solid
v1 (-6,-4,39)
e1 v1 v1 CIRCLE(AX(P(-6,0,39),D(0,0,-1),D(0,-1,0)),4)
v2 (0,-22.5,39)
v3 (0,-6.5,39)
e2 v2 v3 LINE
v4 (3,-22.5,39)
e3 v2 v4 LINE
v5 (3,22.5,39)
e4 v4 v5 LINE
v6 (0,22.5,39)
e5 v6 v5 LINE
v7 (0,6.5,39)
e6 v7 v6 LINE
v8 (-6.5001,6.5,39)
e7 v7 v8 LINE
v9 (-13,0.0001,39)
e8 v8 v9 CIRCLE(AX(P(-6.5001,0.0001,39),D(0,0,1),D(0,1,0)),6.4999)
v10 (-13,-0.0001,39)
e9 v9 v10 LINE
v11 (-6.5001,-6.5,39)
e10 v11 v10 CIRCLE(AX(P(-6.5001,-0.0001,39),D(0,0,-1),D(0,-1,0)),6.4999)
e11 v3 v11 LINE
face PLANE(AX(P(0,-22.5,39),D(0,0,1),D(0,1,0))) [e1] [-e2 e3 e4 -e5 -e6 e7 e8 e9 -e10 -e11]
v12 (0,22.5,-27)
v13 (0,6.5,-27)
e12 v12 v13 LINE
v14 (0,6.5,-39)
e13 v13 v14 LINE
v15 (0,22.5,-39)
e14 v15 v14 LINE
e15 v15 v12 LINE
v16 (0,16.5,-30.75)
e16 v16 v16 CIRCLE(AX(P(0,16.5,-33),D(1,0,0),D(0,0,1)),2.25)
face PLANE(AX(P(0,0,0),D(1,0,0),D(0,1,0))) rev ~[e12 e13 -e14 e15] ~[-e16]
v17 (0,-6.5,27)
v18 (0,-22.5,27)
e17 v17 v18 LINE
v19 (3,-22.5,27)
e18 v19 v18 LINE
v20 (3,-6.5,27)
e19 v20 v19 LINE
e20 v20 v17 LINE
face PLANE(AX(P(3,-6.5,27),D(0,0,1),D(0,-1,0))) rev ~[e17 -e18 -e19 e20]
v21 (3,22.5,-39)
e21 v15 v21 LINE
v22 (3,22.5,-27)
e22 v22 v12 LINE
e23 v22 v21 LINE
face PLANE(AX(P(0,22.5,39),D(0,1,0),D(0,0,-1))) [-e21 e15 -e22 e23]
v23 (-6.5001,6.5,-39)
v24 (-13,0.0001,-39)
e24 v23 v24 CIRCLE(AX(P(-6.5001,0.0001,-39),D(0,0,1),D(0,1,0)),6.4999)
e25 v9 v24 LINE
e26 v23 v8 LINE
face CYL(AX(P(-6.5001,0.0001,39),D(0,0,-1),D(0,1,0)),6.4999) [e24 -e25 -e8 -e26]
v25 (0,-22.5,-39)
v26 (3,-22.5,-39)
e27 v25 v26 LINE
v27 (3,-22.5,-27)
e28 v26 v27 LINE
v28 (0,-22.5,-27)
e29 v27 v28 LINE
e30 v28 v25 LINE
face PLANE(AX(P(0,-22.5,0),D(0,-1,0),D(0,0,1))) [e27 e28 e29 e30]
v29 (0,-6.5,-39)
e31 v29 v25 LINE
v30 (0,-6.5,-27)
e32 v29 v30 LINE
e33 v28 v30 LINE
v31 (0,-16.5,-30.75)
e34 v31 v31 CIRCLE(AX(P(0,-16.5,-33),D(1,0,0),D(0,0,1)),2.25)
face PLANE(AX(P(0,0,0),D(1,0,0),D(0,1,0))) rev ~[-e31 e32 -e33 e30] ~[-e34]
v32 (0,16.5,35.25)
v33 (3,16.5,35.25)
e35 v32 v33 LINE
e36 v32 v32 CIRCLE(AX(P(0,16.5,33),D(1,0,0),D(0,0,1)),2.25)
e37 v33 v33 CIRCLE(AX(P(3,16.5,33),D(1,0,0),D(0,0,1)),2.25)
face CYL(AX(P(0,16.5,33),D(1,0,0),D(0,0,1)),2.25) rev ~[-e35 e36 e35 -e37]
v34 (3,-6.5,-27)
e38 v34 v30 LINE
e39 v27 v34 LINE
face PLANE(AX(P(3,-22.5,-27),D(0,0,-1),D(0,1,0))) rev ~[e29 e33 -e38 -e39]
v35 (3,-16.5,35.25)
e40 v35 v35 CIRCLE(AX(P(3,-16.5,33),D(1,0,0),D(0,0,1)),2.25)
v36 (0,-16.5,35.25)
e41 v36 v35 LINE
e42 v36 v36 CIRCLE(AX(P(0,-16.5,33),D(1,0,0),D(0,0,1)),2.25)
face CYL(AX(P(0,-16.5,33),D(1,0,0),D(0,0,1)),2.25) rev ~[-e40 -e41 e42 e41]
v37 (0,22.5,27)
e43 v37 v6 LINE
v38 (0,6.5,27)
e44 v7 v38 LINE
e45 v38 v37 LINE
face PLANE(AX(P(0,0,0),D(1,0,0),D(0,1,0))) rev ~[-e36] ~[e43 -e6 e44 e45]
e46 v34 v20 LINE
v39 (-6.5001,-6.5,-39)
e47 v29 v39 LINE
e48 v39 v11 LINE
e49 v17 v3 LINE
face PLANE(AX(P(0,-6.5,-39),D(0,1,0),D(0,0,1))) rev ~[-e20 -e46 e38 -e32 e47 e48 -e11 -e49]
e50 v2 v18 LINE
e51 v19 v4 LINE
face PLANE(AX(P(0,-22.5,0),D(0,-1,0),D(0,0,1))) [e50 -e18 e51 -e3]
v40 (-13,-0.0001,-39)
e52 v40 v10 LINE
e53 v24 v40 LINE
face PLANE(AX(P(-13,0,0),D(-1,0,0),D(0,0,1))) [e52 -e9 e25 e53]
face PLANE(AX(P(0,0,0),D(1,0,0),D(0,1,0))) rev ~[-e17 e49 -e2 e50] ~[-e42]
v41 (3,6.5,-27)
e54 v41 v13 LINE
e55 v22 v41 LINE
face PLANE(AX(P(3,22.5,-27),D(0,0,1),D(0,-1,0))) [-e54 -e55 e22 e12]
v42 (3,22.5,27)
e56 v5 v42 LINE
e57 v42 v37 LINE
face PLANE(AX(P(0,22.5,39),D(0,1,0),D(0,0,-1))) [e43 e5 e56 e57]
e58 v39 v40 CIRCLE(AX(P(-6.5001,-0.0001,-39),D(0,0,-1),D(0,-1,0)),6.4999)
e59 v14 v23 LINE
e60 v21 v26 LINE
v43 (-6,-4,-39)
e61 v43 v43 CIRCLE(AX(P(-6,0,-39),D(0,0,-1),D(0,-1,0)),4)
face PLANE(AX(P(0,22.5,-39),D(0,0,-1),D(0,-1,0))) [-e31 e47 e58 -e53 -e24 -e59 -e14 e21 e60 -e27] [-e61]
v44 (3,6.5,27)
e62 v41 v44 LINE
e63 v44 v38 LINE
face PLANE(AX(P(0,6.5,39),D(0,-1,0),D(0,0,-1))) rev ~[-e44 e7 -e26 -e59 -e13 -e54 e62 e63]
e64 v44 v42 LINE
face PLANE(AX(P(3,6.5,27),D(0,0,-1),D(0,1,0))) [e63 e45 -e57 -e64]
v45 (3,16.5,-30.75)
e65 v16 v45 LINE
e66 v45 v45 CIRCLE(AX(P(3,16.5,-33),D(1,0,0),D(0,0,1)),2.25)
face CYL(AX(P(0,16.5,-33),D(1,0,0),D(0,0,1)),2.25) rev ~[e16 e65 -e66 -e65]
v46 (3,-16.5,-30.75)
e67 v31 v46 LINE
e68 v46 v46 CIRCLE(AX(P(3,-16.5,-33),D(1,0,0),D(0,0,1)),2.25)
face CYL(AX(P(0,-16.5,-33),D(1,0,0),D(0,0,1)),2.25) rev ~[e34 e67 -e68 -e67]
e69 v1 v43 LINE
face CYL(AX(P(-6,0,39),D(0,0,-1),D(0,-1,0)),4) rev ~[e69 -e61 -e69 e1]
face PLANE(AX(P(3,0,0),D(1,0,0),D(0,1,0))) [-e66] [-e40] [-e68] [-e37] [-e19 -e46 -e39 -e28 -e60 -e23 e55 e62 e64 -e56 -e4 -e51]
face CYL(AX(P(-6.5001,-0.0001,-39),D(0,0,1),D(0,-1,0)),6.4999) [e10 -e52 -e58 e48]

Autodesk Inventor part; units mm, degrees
ref_plane "YZ Plane" through (0, 0, 0) normal (1, 0, 0) x (0, 1, 0)
ref_plane "XZ Plane" through (0, 0, 0) normal (0, 1, 0) x (-1, 0, 0)
ref_plane "XY Plane" through (0, 0, 0) normal (0, 0, 1) x (1, 0, 0)
sketch "Sketch1" plane through (0, 0, 0) normal (1, 0, 0) x (0, 1, 0)
  line L0 (-22.5, 39) -> (22.5, 39)
  line L1 (22.5, -39) -> (-22.5, -39)
  line L2 (-22.5, 39) -> (22.5, -39) construction
  line L3 (22.5, 39) -> (-22.5, -39) construction
  line L4 (22.5, 39) -> (22.5, -39)
  line L5 (-22.5, -39) -> (-22.5, 39)
  line L6 (22.5, 0) -> (-22.5, 0)
  point P0 (0, 0)
  point P1 (16.5, 33)
  point P2 (-16.5, 33)
  point P3 (16.5, -33)
  point P4 (-16.5, -33)
  dimension "d43" = 78
  dimension "d44" = 45
  dimension "d45" = 6
  dimension "d46" = 6
  dimension "d47" = 6
  dimension "d48" = 6
extrude "Extrusion3" add sketch "Sketch1" along normal blind 3
hole "Hole3" at (0, 16.5, 33) at (0, 16.5, -33) at (0, -16.5, -33) at (0, -16.5, 33) direction (1, 0, 0) diameter 4.5 end through all clearance for "Flat Head Machine Screw" size "M4" standard "Ansi Metric M Profile"
sketch "Sketch4" plane through (0, 0, 0) normal (-1, 0, 0) x (0, 0, 1)
  line L0 (39, 22.5) -> (39, -22.5) projected
  line L1 (-39, -6.5) -> (39, -6.5)
  line L2 (39, -6.5) -> (39, 6.5)
  line L3 (39, 6.5) -> (-39, 6.5)
  line L4 (-39, 6.5) -> (-39, -6.5)
  line L5 (-39, -6.5) -> (39, 6.5) construction
  line L6 (39, -6.5) -> (-39, 6.5) construction
  point P0 (0, 0)
  dimension "d49" = 13
extrude "Extrusion4" add sketch "Sketch4" along normal blind 13
full round fillet "Full Round Fillet2" first side at (-4.3333, -6.5, -13) centre faces at (-13, 2.1667, -13) second side at (-4.3333, 6.5, 13)
sketch "Sketch5" plane through (0, -22.5, 39) normal (0, 0, 1) x (1, 0, 0)
  line L0 (0, 29) -> (-6.5, 29) projected
  point P0 (0, 22.5)
  point P1 (-6, 22.5)
  dimension "d52" = 6
  dimension "d53" = 6.5
hole "Hole4" at (-6, 0, 39) direction (0, 0, -1) diameter 8 end through all
sketch "Sketch6" plane through (3, 0, 0) normal (1, 0, 0) x (0, 0, -1)
  line L0 (39, 22.5) -> (-39, 22.5) projected
  line L1 (39, 6.5) -> (-39, 6.5) projected
  line L2 (-27, 22.5) -> (27, 22.5)
  line L3 (27, 22.5) -> (27, 6.5)
  line L4 (27, 6.5) -> (-27, 6.5)
  line L5 (-27, 6.5) -> (-27, 22.5)
  line L6 (-39, -22.5) -> (39, -22.5) projected
  line L7 (-27, -22.5) -> (27, -22.5)
  line L8 (27, -22.5) -> (27, -6.5)
  line L9 (27, -6.5) -> (-27, -6.5)
  line L10 (-27, -6.5) -> (-27, -22.5)
  line L11 (-39, -6.5) -> (39, -6.5) projected
  circle A0 centre (33, 16.5) radius 2.25 projected
  circle A1 centre (-33, 16.5) radius 2.25 projected
  point P0 (0, 0)
  point P1 (27, -22.5)
  dimension "d61" = 0
  dimension "d62" = 6
  dimension "d63" = 6
extrude "Extrusion5" cut sketch "Sketch6" against normal blind 10 contours L3 L1 L5 L0 | L10 L9 L8 L6
properties part number "Axle Hold"
